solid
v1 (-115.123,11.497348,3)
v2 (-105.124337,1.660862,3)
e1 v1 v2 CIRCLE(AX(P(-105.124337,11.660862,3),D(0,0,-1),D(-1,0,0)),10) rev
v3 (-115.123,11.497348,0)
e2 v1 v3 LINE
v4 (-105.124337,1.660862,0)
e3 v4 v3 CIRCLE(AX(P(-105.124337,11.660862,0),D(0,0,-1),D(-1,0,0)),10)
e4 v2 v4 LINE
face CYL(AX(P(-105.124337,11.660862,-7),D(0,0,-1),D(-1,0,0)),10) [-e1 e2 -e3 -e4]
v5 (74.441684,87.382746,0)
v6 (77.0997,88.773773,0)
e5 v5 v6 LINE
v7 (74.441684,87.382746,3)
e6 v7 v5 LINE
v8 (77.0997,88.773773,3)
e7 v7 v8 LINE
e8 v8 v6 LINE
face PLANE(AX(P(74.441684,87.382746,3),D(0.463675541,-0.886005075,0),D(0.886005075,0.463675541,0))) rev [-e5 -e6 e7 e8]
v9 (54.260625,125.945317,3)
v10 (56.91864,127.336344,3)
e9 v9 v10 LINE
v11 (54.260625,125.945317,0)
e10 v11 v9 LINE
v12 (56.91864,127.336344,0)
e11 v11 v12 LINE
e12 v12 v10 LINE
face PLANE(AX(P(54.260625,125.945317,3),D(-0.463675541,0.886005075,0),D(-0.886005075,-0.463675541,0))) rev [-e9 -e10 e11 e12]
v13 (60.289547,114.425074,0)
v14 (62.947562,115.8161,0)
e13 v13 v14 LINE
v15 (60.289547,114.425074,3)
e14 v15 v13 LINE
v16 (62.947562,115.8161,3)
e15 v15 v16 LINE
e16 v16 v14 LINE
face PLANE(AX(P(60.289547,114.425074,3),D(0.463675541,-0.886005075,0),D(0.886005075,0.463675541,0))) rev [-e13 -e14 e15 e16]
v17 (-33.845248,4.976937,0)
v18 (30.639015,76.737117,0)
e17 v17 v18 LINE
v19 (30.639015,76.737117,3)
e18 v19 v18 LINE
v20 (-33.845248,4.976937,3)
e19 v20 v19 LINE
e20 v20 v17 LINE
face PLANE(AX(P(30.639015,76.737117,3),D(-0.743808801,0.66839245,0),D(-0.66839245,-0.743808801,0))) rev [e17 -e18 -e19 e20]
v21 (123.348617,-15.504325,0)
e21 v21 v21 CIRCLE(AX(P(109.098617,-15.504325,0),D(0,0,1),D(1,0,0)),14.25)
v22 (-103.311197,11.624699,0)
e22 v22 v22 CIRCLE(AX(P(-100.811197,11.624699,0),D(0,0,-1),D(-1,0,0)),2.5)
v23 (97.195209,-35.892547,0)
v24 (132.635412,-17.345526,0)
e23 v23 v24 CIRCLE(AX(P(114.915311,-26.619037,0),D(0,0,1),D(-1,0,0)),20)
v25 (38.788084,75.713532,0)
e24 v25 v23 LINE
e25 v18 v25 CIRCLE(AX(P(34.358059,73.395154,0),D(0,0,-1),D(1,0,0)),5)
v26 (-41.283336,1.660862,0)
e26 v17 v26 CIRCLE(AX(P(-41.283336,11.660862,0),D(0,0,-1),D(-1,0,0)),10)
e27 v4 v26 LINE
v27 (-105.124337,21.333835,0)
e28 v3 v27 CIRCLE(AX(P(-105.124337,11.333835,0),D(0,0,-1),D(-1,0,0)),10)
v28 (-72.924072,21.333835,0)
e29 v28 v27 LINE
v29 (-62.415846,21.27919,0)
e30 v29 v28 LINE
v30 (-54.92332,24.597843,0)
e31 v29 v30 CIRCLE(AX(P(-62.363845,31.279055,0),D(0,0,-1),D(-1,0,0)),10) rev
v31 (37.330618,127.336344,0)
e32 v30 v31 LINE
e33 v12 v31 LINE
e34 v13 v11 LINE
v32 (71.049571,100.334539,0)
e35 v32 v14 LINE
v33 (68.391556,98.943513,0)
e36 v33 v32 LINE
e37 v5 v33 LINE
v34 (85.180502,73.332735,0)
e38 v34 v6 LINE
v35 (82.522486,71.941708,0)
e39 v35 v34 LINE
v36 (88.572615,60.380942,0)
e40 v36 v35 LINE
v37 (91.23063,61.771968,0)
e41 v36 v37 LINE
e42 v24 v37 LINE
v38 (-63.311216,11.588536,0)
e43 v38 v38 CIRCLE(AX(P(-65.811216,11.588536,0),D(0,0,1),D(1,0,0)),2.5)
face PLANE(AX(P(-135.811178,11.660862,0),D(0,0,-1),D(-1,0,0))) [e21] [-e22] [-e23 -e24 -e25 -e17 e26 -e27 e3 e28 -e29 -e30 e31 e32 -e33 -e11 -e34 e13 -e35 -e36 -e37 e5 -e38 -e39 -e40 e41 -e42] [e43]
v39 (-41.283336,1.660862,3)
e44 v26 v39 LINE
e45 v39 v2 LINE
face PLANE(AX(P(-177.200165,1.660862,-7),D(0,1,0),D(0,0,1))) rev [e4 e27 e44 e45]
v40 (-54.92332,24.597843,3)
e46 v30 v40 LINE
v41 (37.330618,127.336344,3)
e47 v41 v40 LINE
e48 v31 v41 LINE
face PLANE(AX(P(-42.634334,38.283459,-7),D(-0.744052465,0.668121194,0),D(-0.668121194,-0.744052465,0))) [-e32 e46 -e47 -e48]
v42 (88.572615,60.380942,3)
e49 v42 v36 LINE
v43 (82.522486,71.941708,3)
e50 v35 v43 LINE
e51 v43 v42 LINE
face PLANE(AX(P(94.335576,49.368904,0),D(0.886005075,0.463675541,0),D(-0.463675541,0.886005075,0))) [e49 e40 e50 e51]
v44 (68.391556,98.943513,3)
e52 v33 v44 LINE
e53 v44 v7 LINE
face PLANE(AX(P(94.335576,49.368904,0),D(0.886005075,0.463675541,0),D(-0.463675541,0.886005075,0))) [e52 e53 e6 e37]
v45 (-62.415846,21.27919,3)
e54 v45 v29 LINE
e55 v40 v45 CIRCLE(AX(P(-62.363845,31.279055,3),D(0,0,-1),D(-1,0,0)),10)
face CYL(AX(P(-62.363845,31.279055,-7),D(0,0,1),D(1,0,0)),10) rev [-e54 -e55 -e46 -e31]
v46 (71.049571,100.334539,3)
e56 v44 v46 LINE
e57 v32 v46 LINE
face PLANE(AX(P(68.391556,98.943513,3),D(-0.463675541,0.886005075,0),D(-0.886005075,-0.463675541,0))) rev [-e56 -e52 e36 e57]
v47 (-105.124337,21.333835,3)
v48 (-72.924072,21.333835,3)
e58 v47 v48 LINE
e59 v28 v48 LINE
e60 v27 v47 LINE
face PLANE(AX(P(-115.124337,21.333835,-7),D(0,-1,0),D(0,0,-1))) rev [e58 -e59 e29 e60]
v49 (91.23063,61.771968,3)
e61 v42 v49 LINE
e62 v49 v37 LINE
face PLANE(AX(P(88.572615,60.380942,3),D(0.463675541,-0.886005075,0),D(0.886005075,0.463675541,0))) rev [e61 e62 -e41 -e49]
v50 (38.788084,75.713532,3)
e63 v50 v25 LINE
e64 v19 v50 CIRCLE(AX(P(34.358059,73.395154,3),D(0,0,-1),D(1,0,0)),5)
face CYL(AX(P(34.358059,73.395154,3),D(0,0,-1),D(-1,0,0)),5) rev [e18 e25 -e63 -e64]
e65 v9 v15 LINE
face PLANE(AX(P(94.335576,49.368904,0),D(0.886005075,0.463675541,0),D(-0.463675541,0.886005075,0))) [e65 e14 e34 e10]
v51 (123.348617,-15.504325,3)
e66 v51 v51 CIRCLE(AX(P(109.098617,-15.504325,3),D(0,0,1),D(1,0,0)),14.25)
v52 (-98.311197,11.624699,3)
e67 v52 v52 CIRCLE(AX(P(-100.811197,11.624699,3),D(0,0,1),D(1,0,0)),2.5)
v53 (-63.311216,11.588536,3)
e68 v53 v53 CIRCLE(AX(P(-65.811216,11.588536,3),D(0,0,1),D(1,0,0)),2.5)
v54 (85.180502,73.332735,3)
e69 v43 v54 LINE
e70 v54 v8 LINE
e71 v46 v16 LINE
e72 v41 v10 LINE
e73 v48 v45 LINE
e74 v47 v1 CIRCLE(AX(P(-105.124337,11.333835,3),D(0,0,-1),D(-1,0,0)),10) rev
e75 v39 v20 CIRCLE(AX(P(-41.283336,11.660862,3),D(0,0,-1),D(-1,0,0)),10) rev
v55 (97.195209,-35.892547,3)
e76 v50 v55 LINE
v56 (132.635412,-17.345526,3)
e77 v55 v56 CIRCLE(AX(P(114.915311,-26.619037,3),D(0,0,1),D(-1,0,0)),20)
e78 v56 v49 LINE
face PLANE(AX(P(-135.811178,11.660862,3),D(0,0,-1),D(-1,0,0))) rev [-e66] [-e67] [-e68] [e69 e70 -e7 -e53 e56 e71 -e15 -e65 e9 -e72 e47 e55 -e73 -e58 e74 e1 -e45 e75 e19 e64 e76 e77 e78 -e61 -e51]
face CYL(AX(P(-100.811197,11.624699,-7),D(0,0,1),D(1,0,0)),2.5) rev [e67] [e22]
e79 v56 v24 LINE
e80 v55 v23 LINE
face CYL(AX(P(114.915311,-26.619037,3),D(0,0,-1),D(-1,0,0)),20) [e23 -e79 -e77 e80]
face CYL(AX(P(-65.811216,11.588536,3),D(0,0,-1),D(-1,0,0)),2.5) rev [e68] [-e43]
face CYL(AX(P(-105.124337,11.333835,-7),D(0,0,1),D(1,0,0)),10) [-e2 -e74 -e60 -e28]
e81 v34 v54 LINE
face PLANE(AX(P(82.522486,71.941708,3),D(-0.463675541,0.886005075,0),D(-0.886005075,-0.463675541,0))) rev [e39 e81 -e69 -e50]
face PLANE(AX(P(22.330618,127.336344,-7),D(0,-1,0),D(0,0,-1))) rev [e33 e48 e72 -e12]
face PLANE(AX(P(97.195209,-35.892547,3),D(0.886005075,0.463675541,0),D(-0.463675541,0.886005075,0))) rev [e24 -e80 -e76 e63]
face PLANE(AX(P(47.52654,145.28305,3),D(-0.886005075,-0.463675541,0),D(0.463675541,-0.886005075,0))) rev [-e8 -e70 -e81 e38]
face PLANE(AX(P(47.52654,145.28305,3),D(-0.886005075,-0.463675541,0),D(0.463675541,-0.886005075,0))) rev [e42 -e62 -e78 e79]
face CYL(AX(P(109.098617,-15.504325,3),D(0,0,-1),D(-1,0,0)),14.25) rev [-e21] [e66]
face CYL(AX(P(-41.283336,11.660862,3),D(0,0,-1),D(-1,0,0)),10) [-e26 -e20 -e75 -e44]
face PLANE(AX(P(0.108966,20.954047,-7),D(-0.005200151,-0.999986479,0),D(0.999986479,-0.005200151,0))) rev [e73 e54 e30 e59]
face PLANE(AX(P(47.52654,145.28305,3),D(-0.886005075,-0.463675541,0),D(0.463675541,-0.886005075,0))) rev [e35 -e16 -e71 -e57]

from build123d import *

# Parameters (mm, degrees)
CROQUIS1_R              = 2.5
CROQUIS1_R_2            = 14.25
SALIENTE_EXTRUIR1_DEPTH = 3
CROQUIS3_W              = 3
CROQUIS3_H              = 13.002457907
CROQUIS3_H_2            = 13.048194377
CROQUIS3_H_3            = 13.048194378
CORTAR_EXTRUIR1_DEPTH   = 3
CROQUIS4_W              = 163.675423661
CROQUIS4_H              = 10
CORTAR_EXTRUIR2_DEPTH   = 10
REDONDEO1_R             = 10
CROQUIS5_R              = 2.5
CORTAR_EXTRUIR3_DEPTH   = 10
CORTAR_EXTRUIR4_DEPTH   = 10
CORTAR_EXTRUIR5_DEPTH   = 10
REDONDEO2_R             = 10


with BuildPart() as part:
    # Croquis1 → Saliente-Extruir1 (new body)
    with BuildSketch(Plane.XY):
        with BuildLine():
            Line((-135.811178416, 31.660861846), (-65.873242367, 31.660861846))
            ThreePointArc((-65.873242367, 31.660861846), (-63.837291884, 32.094144685), (-62.154198363, 33.318899594))
            Line((-62.154198363, 33.318899594), (39.377470593, 146.306634388))
            ThreePointArc((39.377470593, 146.306634388), (43.719655801, 147.925689677), (47.526539972, 145.28304984))
            Line((47.526539972, 145.28304984), (132.635412267, -17.345525839))
            ThreePointArc((132.635412267, -17.345525839), (124.188821584, -44.339138154), (97.195209269, -35.892547471))
            Line((97.195209269, -35.892547471), (38.788084081, 75.713532162))
            ThreePointArc((38.788084081, 75.713532162), (34.981199909, 78.356171999), (30.639014702, 76.737116711))
            Line((30.639014702, 76.737116711), (-44.321252629, -6.681100406))
            ThreePointArc((-44.321252629, -6.681100406), (-46.00434615, -7.905855315), (-48.040296633, -8.339138154))
            Line((-48.040296633, -8.339138154), (-135.811178416, -8.339138154))
            ThreePointArc((-135.811178416, -8.339138154), (-155.811178416, 11.660861846), (-135.811178416, 31.660861846))
        make_face()
        with Locations((-135.811178416, 11.660861846)):
            Circle(CROQUIS1_R, mode=Mode.SUBTRACT)
        with Locations((-65.81121578, 11.5885363)):
            Circle(CROQUIS1_R, mode=Mode.SUBTRACT)
        with Locations((109.098617172, -15.504324767)):
            Circle(CROQUIS1_R_2, mode=Mode.SUBTRACT)
    extrude(amount=SALIENTE_EXTRUIR1_DEPTH)

    # Croquis3 → Cortar-Extruir1 (cut)
    with BuildSketch(Plane(origin=(96.993591322, 50.759930368, 0), x_dir=(0, 0, -1), z_dir=(0.8860050749641628, 0.46367554080169926, 0))):
        with Locations((-1.5, 79.927636726)):
            Rectangle(CROQUIS3_W, CROQUIS3_H)
        with Locations((-1.5, 49.42886568)):
            Rectangle(CROQUIS3_W, CROQUIS3_H_2)
        with Locations((-1.5, 18.952962868)):
            Rectangle(CROQUIS3_W, CROQUIS3_H_3)
    extrude(amount=-CORTAR_EXTRUIR1_DEPTH, mode=Mode.SUBTRACT)

    # Croquis4 → Cortar-Extruir2 (cut)
    with BuildSketch(Plane.XY.offset(3)):
        with Locations((-95.362453556, -3.339138154)):
            Rectangle(CROQUIS4_W, CROQUIS4_H)
    extrude(amount=-CORTAR_EXTRUIR2_DEPTH, mode=Mode.SUBTRACT)

    # Redondeo1
    redondeo1_edges = [part.edges().sort_by_distance(p)[0] for p in [
        (-153.131686492, 1.660861846, 1.5),
        (-36.825099605, 1.660861846, 1.5),
    ]]
    fillet(redondeo1_edges, radius=REDONDEO1_R)

    # Croquis5 → Cortar-Extruir3 (cut)
    with BuildSketch(Plane.XY.offset(3)):
        Polygon((-63.64412415, 31.660861846), (-72.924071867, 21.333834995), (-57.92427468, 21.255832735), (-48.581088821, 31.660861846), align=None)
        Polygon((-62.154198363, 33.318899594), (-63.64412415, 31.660861846), (-48.581088821, 31.660861846), (37.330618128, 127.336343983), (22.330618128, 127.336343983), align=None)
        with Locations((-100.811197098, 11.624699073)):
            Circle(CROQUIS5_R)
    extrude(amount=-CORTAR_EXTRUIR3_DEPTH, mode=Mode.SUBTRACT)

    # Croquis6 → Cortar-Extruir4 (cut)
    with BuildSketch(Plane.XY.offset(3)):
        Polygon((-72.924071867, 21.333834995), (-60.713701646, 34.921931069), (-169.534972591, 34.921931069), (-169.534972591, 0), (-115.124337118, 0), (-115.124337118, 21.333834995), align=None)
    extrude(amount=-CORTAR_EXTRUIR4_DEPTH, mode=Mode.SUBTRACT)

    # Croquis7 → Cortar-Extruir5 (cut)
    with BuildSketch(Plane.XY.offset(3)):
        Polygon((22.330618128, 127.336343983), (78.839367292, 127.336343983), (43.163788292, 161.798984153), align=None)
    extrude(amount=-CORTAR_EXTRUIR5_DEPTH, mode=Mode.SUBTRACT)

    # Redondeo2
    # the kernel refuses this fillet: 10 mm, written as the material it adds along each edge
    with BuildSketch(Plane(origin=(-57.92427468, 21.255832735, 3), x_dir=(0.6681211936204373, 0.744052464974885, 0), z_dir=(0, 0, -1))) as redondeo2_piece_1:
        with BuildLine():
            CenterArc((REDONDEO2_R * 0.449163221223, -REDONDEO2_R), REDONDEO2_R, 90, 48.37572531)
            Line((-REDONDEO2_R * 0.298353514379, -REDONDEO2_R * 0.335757024882), (0, 0))
            Line((0, 0), (REDONDEO2_R * 0.449163221223, 0))
        make_face()
    extrude(amount=3)
    # the kernel refuses this fillet: 10 mm, written as the material it takes off along each edge
    with BuildSketch(Plane(origin=(-115.124337118, 1.660861846, 28), x_dir=(1, 0, 0), z_dir=(0, 0, -1))) as redondeo2_2_piece_1:
        with BuildLine():
            CenterArc((REDONDEO2_R, -REDONDEO2_R), REDONDEO2_R, 90, 90)
            Line((0, -REDONDEO2_R), (0, 0))
            Line((0, 0), (REDONDEO2_R, 0))
        make_face()
    extrude(amount=53, mode=Mode.SUBTRACT)
    with BuildSketch(Plane(origin=(-115.124337118, 21.333834995, 28), x_dir=(1, 0, 0), z_dir=(0, 0, -1))) as redondeo2_2_piece_2:
        with BuildLine():
            CenterArc((REDONDEO2_R, REDONDEO2_R), REDONDEO2_R, 180, 90)
            Line((0, REDONDEO2_R), (0, 0))
            Line((0, 0), (REDONDEO2_R, 0))
        make_face()
    extrude(amount=53, mode=Mode.SUBTRACT)


solid = part.part
